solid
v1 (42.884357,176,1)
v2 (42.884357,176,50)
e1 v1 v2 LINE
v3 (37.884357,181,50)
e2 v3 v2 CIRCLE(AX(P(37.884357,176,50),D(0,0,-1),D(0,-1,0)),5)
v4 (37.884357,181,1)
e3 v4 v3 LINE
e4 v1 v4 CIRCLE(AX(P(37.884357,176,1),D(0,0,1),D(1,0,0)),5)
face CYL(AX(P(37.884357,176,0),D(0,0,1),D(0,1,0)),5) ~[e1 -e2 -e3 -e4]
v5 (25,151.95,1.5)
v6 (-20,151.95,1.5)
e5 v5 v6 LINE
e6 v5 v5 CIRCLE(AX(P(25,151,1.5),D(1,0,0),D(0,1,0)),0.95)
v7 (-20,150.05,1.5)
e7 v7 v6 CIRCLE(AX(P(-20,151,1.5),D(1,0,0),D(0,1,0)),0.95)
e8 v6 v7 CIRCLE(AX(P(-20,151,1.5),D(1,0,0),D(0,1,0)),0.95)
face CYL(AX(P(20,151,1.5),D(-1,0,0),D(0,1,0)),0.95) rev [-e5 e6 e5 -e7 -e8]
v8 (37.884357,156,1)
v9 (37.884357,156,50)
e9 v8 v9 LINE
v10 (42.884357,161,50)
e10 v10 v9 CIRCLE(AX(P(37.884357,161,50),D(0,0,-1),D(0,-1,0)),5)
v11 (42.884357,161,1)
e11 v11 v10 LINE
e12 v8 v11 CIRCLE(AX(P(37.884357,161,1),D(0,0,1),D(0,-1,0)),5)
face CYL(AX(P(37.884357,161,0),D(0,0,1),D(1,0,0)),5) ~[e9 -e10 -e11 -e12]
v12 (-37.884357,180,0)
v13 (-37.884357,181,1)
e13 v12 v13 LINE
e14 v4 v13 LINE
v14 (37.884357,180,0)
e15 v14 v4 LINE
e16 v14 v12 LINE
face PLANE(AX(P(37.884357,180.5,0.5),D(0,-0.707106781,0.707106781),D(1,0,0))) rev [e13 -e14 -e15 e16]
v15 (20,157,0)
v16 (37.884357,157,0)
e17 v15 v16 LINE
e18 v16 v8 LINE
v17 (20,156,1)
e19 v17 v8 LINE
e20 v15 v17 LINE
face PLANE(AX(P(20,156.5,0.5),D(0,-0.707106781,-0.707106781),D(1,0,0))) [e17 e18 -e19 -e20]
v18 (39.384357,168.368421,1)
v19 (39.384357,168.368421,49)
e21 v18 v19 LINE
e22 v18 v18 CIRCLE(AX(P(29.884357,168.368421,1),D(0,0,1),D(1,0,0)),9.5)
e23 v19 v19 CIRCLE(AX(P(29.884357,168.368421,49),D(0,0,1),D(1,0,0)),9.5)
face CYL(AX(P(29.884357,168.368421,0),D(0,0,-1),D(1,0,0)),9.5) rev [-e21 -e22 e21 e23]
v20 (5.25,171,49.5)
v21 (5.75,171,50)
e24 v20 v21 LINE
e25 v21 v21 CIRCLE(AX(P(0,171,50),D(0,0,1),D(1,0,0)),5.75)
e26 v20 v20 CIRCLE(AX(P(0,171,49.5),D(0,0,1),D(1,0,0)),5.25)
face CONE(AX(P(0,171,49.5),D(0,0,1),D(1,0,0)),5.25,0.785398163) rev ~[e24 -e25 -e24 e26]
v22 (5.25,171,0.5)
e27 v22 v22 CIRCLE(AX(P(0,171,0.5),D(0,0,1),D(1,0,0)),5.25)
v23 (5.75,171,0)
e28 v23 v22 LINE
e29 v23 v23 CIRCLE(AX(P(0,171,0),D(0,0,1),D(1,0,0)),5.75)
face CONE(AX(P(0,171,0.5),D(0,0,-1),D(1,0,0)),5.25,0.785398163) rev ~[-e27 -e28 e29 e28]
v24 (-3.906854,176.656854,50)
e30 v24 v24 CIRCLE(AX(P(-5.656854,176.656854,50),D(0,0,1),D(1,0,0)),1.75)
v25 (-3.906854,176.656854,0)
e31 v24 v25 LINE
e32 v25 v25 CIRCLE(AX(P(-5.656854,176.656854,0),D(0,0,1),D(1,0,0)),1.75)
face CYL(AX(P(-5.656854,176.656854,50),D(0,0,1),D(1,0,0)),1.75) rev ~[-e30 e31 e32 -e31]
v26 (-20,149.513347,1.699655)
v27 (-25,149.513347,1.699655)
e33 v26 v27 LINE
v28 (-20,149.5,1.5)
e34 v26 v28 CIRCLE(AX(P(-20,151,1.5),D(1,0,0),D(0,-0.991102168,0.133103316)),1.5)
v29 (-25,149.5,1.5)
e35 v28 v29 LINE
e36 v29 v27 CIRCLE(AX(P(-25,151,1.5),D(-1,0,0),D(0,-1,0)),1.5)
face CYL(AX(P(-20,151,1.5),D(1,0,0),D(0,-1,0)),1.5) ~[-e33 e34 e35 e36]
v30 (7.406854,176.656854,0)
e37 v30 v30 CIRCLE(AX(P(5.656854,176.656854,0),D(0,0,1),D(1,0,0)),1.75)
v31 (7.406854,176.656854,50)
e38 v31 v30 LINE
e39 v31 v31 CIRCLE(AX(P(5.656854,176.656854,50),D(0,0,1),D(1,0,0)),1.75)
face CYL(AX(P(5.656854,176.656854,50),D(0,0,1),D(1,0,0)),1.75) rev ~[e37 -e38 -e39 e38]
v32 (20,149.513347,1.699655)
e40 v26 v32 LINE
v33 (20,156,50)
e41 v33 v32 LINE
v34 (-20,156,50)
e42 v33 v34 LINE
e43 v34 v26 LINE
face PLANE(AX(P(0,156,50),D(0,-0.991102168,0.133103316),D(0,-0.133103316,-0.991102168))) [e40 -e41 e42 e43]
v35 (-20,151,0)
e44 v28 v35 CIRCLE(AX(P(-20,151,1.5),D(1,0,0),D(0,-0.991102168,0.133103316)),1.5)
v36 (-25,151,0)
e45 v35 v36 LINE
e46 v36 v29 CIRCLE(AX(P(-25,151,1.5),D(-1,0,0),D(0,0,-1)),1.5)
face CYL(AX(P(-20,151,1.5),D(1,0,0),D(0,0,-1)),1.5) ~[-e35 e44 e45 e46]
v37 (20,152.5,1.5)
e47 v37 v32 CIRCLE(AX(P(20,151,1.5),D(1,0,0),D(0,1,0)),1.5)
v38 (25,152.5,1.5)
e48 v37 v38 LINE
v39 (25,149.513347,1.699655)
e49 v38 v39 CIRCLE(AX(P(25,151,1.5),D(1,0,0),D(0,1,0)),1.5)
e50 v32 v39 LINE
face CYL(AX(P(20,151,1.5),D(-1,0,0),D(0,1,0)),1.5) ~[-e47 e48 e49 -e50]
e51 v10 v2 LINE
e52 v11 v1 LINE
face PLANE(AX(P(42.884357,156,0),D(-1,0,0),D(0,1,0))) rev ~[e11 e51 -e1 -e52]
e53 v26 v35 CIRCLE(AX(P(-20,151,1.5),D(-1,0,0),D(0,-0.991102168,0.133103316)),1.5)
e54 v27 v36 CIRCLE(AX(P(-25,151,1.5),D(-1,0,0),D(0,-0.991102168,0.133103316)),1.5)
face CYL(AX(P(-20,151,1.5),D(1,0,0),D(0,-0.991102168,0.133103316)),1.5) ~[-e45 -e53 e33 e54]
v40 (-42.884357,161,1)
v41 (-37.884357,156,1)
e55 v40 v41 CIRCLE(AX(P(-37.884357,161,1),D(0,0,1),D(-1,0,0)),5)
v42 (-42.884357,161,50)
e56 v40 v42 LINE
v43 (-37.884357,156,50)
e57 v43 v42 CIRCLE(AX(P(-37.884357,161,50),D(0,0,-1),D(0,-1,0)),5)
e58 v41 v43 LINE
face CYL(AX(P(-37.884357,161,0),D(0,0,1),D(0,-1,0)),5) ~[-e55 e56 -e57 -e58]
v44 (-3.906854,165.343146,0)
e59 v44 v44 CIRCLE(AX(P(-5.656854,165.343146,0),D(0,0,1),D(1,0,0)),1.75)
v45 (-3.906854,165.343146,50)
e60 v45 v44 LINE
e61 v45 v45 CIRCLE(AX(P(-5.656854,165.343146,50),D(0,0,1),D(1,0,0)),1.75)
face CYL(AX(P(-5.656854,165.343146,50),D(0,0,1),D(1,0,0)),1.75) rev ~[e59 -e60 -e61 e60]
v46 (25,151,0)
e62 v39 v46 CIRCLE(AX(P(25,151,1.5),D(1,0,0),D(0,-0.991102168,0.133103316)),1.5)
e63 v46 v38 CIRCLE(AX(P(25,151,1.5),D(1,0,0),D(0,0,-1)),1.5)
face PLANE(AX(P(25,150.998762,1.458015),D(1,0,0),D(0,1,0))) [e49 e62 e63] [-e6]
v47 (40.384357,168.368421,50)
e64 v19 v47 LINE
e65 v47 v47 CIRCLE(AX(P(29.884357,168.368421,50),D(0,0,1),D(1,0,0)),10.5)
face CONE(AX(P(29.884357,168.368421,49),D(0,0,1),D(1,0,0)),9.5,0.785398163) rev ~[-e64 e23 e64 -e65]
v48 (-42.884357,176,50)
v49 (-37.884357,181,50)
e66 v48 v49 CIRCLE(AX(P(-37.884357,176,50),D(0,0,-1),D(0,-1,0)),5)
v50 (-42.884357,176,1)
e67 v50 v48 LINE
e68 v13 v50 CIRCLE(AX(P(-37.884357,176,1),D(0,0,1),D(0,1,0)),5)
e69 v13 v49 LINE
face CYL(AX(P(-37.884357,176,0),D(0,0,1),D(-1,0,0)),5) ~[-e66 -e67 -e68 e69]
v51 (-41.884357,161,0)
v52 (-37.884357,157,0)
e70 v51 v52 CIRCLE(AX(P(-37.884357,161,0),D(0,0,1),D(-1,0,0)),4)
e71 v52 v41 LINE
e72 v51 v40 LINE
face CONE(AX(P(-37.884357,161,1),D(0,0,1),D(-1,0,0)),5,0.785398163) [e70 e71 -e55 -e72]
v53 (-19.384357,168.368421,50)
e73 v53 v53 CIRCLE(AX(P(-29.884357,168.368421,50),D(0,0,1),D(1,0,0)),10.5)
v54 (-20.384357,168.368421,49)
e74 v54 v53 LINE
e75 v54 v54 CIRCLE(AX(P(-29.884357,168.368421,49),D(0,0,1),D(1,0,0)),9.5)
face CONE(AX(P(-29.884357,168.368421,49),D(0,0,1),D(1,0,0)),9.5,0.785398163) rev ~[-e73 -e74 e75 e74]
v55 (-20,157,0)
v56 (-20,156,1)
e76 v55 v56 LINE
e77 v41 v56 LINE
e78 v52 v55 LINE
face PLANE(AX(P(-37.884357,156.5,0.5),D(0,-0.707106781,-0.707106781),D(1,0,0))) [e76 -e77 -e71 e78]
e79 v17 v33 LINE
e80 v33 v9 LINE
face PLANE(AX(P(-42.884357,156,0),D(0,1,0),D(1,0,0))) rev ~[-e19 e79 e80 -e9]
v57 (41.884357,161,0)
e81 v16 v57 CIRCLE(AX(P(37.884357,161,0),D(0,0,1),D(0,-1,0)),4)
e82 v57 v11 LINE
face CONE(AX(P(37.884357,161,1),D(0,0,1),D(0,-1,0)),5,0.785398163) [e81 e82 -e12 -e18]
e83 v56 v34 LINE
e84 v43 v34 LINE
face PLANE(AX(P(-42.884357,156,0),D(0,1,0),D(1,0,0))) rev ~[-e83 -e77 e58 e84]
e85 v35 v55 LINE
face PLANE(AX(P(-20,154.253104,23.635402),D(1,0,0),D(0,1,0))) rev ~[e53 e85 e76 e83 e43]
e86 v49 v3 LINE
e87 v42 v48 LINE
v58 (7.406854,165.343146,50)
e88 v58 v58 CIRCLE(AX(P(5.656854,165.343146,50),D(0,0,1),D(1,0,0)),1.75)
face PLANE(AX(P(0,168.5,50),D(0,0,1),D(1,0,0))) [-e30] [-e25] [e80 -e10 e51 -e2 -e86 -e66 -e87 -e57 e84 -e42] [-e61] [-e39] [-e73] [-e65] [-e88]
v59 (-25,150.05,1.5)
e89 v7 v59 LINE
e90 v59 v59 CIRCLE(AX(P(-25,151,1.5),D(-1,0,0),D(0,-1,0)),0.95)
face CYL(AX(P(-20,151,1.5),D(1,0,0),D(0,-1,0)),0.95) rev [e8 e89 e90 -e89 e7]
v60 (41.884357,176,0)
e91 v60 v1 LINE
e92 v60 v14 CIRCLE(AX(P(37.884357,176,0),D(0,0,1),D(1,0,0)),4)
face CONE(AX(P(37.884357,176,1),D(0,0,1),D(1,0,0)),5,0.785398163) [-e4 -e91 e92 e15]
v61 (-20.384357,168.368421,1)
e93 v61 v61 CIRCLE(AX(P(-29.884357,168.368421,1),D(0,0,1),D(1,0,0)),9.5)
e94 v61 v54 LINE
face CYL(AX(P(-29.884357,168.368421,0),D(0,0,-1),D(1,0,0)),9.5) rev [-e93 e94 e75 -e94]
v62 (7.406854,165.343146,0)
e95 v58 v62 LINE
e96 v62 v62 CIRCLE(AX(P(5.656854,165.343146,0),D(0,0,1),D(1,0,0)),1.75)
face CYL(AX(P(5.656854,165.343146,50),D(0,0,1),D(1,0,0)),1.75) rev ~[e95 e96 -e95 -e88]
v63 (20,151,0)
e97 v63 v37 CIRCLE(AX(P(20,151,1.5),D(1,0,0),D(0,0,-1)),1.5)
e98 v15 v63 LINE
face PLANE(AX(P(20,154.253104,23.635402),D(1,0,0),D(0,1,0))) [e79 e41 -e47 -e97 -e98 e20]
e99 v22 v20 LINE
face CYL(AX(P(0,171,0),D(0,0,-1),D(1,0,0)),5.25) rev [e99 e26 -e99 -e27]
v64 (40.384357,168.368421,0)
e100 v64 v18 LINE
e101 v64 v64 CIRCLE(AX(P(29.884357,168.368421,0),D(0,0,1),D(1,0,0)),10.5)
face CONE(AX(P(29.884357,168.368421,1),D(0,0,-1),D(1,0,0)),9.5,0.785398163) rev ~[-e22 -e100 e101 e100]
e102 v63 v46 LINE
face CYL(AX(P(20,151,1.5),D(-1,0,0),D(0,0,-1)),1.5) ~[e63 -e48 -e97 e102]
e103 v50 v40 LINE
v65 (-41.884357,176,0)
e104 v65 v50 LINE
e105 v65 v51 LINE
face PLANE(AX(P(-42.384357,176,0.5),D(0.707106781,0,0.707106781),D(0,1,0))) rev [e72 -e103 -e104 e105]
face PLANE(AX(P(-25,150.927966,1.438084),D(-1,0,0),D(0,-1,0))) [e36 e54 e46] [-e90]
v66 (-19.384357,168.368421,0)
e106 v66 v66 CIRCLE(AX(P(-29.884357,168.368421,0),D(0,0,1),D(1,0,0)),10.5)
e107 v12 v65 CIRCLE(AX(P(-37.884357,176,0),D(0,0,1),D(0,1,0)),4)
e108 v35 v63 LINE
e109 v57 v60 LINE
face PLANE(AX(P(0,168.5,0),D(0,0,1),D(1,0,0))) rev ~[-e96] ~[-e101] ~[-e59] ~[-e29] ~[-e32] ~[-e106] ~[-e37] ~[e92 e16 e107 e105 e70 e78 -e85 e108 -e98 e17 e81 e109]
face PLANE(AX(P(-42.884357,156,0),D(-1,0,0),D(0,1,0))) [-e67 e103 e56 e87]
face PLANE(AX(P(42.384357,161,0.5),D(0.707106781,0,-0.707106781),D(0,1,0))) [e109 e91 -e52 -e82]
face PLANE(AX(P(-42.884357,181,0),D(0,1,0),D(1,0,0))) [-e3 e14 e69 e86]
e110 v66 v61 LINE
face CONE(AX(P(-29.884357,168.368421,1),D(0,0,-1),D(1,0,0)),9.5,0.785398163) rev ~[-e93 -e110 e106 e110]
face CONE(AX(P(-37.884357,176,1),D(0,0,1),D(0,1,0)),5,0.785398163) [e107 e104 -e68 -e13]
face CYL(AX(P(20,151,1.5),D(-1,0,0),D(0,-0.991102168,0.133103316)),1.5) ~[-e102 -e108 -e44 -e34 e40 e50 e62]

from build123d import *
from build123d import SkipClean  # not in build123d's __all__

# Parameters (mm, degrees)
F0_W      = 85.7687139645
F0_H      = 25
F0_R      = 9.5
F0_R_2    = 5.25
F1_DEPTH  = 50
F3_R      = 0.95
F4_DEPTH  = 20
F5_R      = 0.95
F6_DEPTH  = 5
F7_R      = 0.95
F8_DEPTH  = 5
F9_R      = 1.75
F10_DEPTH = 50
F11_R     = 5
F12_SIZE  = 1
F13_SIZE  = 0.5
F14_SIZE  = 1


# Not quite as in the source:
# - after a boolean that leaves OpenCascade's solid faulty, fix() repairs it


with BuildPart() as f1:
    # F0 (on Top) → F1 (new body)
    with BuildSketch(Plane.XY):
        with Locations((0, 168.5)):
            Rectangle(F0_W, F0_H)
        with Locations((-29.8843569823, 168.3684210526)):
            Circle(F0_R, mode=Mode.SUBTRACT)
        with Locations((29.8843569823, 168.3684210526)):
            Circle(F0_R, mode=Mode.SUBTRACT)
        with Locations((0, 171)):
            Circle(F0_R_2, mode=Mode.SUBTRACT)
    extrude(amount=F1_DEPTH)

    # F3 (on mid) → F4 (join, symmetric)
    with BuildSketch(Plane.YZ):
        with BuildLine():
            Line((156, 50), (149.5133467482, 1.6996549744))
            ThreePointArc((149.5133467482, 1.6996549744), (149.8709556117, 0.5124480929), (151, 0))
            Line((151, 0), (156, 0))
            Line((156, 0), (156, 50))
        make_face()
        with Locations((151, 1.5)):
            Circle(F3_R, mode=Mode.SUBTRACT)
    extrude(amount=F4_DEPTH, both=True)

    # F5 (on face) → F6 (join)
    with BuildSketch(Plane.YZ.offset(20)):
        with BuildLine():
            ThreePointArc((151, 0), (152.0606601718, 0.4393398282), (152.5, 1.5))
            ThreePointArc((152.5, 1.5), (151.100050293, 2.9966595935), (149.5133467482, 1.6996549744))
            ThreePointArc((149.5133467482, 1.6996549744), (149.8709556117, 0.5124480929), (151, 0))
        make_face()
        with Locations((151, 1.5)):
            Circle(F5_R, mode=Mode.SUBTRACT)
    extrude(amount=F6_DEPTH)

    # F7 (on face) → F8 (join)
    with BuildSketch(Plane(origin=(-20, 0, 0), x_dir=(0, -1, 0), z_dir=(-1, 0, 0))):
        with BuildLine():
            ThreePointArc((-151, 0), (-149.9393398282, 0.4393398282), (-149.5, 1.5))
            ThreePointArc((-149.5, 1.5), (-149.5033404065, 1.600050293), (-149.5133467482, 1.6996549744))
            ThreePointArc((-149.5133467482, 1.6996549744), (-152.1290443883, 2.4875519071), (-151, 0))
        make_face()
        with Locations((-151, 1.5)):
            Circle(F7_R, mode=Mode.SUBTRACT)
    with SkipClean():  # cleaning this boolean's faces spoils the solid; the shape is the same uncleaned
        extrude(amount=F8_DEPTH)

    # F9 (on face) → F10 (cut, through all)
    with BuildSketch(Plane.XY.offset(50)):
        with Locations((5.6568542495, 176.6568542495)):
            Circle(F9_R)
        with Locations((-5.6568542495, 176.6568542495)):
            Circle(F9_R)
        with Locations((-5.6568542495, 165.3431457505)):
            Circle(F9_R)
        with Locations((5.6568542495, 165.3431457505)):
            Circle(F9_R)
    extrude(amount=-F10_DEPTH, mode=Mode.SUBTRACT)

    add(f1.part.fix(), mode=Mode.REPLACE)

    # F11
    f11_edges = [f1.edges().sort_by_distance(p)[0] for p in [
        (42.884357, 156, 25),
        (42.884357, 181, 25),
        (-42.884357, 181, 25),
        (-42.884357, 156, 25),
    ]]
    fillet(f11_edges, radius=F11_R)

    # F12
    f12_edges = [f1.edges().sort_by_distance(p)[0] for p in [
        (20.384357, 168.368421, 50),
        (-39.384357, 168.368421, 50),
        (20.384357, 168.368421, 0),
        (-39.384357, 168.368421, 0),
    ]]
    chamfer(f12_edges, length=F12_SIZE)

    # F13
    f13_edges = [f1.edges().sort_by_distance(p)[0] for p in [
        (-5.25, 171, 50),
        (-5.25, 171, 0),
    ]]
    chamfer(f13_edges, length=F13_SIZE)

    # F14
    f14_edges = [f1.edges().sort_by_distance(p)[0] for p in [
        (-28.942178, 156, 0),
        (-41.419891, 157.464466, 0),
        (42.884357, 168.5, 0),
        (41.419891, 157.464466, 0),
        (41.419891, 179.535534, 0),
        (28.942178, 156, 0),
        (0, 181, 0),
        (-41.419891, 179.535534, 0),
        (-42.884357, 168.5, 0),
    ]]
    chamfer(f14_edges, length=F14_SIZE)


solid = f1.part
